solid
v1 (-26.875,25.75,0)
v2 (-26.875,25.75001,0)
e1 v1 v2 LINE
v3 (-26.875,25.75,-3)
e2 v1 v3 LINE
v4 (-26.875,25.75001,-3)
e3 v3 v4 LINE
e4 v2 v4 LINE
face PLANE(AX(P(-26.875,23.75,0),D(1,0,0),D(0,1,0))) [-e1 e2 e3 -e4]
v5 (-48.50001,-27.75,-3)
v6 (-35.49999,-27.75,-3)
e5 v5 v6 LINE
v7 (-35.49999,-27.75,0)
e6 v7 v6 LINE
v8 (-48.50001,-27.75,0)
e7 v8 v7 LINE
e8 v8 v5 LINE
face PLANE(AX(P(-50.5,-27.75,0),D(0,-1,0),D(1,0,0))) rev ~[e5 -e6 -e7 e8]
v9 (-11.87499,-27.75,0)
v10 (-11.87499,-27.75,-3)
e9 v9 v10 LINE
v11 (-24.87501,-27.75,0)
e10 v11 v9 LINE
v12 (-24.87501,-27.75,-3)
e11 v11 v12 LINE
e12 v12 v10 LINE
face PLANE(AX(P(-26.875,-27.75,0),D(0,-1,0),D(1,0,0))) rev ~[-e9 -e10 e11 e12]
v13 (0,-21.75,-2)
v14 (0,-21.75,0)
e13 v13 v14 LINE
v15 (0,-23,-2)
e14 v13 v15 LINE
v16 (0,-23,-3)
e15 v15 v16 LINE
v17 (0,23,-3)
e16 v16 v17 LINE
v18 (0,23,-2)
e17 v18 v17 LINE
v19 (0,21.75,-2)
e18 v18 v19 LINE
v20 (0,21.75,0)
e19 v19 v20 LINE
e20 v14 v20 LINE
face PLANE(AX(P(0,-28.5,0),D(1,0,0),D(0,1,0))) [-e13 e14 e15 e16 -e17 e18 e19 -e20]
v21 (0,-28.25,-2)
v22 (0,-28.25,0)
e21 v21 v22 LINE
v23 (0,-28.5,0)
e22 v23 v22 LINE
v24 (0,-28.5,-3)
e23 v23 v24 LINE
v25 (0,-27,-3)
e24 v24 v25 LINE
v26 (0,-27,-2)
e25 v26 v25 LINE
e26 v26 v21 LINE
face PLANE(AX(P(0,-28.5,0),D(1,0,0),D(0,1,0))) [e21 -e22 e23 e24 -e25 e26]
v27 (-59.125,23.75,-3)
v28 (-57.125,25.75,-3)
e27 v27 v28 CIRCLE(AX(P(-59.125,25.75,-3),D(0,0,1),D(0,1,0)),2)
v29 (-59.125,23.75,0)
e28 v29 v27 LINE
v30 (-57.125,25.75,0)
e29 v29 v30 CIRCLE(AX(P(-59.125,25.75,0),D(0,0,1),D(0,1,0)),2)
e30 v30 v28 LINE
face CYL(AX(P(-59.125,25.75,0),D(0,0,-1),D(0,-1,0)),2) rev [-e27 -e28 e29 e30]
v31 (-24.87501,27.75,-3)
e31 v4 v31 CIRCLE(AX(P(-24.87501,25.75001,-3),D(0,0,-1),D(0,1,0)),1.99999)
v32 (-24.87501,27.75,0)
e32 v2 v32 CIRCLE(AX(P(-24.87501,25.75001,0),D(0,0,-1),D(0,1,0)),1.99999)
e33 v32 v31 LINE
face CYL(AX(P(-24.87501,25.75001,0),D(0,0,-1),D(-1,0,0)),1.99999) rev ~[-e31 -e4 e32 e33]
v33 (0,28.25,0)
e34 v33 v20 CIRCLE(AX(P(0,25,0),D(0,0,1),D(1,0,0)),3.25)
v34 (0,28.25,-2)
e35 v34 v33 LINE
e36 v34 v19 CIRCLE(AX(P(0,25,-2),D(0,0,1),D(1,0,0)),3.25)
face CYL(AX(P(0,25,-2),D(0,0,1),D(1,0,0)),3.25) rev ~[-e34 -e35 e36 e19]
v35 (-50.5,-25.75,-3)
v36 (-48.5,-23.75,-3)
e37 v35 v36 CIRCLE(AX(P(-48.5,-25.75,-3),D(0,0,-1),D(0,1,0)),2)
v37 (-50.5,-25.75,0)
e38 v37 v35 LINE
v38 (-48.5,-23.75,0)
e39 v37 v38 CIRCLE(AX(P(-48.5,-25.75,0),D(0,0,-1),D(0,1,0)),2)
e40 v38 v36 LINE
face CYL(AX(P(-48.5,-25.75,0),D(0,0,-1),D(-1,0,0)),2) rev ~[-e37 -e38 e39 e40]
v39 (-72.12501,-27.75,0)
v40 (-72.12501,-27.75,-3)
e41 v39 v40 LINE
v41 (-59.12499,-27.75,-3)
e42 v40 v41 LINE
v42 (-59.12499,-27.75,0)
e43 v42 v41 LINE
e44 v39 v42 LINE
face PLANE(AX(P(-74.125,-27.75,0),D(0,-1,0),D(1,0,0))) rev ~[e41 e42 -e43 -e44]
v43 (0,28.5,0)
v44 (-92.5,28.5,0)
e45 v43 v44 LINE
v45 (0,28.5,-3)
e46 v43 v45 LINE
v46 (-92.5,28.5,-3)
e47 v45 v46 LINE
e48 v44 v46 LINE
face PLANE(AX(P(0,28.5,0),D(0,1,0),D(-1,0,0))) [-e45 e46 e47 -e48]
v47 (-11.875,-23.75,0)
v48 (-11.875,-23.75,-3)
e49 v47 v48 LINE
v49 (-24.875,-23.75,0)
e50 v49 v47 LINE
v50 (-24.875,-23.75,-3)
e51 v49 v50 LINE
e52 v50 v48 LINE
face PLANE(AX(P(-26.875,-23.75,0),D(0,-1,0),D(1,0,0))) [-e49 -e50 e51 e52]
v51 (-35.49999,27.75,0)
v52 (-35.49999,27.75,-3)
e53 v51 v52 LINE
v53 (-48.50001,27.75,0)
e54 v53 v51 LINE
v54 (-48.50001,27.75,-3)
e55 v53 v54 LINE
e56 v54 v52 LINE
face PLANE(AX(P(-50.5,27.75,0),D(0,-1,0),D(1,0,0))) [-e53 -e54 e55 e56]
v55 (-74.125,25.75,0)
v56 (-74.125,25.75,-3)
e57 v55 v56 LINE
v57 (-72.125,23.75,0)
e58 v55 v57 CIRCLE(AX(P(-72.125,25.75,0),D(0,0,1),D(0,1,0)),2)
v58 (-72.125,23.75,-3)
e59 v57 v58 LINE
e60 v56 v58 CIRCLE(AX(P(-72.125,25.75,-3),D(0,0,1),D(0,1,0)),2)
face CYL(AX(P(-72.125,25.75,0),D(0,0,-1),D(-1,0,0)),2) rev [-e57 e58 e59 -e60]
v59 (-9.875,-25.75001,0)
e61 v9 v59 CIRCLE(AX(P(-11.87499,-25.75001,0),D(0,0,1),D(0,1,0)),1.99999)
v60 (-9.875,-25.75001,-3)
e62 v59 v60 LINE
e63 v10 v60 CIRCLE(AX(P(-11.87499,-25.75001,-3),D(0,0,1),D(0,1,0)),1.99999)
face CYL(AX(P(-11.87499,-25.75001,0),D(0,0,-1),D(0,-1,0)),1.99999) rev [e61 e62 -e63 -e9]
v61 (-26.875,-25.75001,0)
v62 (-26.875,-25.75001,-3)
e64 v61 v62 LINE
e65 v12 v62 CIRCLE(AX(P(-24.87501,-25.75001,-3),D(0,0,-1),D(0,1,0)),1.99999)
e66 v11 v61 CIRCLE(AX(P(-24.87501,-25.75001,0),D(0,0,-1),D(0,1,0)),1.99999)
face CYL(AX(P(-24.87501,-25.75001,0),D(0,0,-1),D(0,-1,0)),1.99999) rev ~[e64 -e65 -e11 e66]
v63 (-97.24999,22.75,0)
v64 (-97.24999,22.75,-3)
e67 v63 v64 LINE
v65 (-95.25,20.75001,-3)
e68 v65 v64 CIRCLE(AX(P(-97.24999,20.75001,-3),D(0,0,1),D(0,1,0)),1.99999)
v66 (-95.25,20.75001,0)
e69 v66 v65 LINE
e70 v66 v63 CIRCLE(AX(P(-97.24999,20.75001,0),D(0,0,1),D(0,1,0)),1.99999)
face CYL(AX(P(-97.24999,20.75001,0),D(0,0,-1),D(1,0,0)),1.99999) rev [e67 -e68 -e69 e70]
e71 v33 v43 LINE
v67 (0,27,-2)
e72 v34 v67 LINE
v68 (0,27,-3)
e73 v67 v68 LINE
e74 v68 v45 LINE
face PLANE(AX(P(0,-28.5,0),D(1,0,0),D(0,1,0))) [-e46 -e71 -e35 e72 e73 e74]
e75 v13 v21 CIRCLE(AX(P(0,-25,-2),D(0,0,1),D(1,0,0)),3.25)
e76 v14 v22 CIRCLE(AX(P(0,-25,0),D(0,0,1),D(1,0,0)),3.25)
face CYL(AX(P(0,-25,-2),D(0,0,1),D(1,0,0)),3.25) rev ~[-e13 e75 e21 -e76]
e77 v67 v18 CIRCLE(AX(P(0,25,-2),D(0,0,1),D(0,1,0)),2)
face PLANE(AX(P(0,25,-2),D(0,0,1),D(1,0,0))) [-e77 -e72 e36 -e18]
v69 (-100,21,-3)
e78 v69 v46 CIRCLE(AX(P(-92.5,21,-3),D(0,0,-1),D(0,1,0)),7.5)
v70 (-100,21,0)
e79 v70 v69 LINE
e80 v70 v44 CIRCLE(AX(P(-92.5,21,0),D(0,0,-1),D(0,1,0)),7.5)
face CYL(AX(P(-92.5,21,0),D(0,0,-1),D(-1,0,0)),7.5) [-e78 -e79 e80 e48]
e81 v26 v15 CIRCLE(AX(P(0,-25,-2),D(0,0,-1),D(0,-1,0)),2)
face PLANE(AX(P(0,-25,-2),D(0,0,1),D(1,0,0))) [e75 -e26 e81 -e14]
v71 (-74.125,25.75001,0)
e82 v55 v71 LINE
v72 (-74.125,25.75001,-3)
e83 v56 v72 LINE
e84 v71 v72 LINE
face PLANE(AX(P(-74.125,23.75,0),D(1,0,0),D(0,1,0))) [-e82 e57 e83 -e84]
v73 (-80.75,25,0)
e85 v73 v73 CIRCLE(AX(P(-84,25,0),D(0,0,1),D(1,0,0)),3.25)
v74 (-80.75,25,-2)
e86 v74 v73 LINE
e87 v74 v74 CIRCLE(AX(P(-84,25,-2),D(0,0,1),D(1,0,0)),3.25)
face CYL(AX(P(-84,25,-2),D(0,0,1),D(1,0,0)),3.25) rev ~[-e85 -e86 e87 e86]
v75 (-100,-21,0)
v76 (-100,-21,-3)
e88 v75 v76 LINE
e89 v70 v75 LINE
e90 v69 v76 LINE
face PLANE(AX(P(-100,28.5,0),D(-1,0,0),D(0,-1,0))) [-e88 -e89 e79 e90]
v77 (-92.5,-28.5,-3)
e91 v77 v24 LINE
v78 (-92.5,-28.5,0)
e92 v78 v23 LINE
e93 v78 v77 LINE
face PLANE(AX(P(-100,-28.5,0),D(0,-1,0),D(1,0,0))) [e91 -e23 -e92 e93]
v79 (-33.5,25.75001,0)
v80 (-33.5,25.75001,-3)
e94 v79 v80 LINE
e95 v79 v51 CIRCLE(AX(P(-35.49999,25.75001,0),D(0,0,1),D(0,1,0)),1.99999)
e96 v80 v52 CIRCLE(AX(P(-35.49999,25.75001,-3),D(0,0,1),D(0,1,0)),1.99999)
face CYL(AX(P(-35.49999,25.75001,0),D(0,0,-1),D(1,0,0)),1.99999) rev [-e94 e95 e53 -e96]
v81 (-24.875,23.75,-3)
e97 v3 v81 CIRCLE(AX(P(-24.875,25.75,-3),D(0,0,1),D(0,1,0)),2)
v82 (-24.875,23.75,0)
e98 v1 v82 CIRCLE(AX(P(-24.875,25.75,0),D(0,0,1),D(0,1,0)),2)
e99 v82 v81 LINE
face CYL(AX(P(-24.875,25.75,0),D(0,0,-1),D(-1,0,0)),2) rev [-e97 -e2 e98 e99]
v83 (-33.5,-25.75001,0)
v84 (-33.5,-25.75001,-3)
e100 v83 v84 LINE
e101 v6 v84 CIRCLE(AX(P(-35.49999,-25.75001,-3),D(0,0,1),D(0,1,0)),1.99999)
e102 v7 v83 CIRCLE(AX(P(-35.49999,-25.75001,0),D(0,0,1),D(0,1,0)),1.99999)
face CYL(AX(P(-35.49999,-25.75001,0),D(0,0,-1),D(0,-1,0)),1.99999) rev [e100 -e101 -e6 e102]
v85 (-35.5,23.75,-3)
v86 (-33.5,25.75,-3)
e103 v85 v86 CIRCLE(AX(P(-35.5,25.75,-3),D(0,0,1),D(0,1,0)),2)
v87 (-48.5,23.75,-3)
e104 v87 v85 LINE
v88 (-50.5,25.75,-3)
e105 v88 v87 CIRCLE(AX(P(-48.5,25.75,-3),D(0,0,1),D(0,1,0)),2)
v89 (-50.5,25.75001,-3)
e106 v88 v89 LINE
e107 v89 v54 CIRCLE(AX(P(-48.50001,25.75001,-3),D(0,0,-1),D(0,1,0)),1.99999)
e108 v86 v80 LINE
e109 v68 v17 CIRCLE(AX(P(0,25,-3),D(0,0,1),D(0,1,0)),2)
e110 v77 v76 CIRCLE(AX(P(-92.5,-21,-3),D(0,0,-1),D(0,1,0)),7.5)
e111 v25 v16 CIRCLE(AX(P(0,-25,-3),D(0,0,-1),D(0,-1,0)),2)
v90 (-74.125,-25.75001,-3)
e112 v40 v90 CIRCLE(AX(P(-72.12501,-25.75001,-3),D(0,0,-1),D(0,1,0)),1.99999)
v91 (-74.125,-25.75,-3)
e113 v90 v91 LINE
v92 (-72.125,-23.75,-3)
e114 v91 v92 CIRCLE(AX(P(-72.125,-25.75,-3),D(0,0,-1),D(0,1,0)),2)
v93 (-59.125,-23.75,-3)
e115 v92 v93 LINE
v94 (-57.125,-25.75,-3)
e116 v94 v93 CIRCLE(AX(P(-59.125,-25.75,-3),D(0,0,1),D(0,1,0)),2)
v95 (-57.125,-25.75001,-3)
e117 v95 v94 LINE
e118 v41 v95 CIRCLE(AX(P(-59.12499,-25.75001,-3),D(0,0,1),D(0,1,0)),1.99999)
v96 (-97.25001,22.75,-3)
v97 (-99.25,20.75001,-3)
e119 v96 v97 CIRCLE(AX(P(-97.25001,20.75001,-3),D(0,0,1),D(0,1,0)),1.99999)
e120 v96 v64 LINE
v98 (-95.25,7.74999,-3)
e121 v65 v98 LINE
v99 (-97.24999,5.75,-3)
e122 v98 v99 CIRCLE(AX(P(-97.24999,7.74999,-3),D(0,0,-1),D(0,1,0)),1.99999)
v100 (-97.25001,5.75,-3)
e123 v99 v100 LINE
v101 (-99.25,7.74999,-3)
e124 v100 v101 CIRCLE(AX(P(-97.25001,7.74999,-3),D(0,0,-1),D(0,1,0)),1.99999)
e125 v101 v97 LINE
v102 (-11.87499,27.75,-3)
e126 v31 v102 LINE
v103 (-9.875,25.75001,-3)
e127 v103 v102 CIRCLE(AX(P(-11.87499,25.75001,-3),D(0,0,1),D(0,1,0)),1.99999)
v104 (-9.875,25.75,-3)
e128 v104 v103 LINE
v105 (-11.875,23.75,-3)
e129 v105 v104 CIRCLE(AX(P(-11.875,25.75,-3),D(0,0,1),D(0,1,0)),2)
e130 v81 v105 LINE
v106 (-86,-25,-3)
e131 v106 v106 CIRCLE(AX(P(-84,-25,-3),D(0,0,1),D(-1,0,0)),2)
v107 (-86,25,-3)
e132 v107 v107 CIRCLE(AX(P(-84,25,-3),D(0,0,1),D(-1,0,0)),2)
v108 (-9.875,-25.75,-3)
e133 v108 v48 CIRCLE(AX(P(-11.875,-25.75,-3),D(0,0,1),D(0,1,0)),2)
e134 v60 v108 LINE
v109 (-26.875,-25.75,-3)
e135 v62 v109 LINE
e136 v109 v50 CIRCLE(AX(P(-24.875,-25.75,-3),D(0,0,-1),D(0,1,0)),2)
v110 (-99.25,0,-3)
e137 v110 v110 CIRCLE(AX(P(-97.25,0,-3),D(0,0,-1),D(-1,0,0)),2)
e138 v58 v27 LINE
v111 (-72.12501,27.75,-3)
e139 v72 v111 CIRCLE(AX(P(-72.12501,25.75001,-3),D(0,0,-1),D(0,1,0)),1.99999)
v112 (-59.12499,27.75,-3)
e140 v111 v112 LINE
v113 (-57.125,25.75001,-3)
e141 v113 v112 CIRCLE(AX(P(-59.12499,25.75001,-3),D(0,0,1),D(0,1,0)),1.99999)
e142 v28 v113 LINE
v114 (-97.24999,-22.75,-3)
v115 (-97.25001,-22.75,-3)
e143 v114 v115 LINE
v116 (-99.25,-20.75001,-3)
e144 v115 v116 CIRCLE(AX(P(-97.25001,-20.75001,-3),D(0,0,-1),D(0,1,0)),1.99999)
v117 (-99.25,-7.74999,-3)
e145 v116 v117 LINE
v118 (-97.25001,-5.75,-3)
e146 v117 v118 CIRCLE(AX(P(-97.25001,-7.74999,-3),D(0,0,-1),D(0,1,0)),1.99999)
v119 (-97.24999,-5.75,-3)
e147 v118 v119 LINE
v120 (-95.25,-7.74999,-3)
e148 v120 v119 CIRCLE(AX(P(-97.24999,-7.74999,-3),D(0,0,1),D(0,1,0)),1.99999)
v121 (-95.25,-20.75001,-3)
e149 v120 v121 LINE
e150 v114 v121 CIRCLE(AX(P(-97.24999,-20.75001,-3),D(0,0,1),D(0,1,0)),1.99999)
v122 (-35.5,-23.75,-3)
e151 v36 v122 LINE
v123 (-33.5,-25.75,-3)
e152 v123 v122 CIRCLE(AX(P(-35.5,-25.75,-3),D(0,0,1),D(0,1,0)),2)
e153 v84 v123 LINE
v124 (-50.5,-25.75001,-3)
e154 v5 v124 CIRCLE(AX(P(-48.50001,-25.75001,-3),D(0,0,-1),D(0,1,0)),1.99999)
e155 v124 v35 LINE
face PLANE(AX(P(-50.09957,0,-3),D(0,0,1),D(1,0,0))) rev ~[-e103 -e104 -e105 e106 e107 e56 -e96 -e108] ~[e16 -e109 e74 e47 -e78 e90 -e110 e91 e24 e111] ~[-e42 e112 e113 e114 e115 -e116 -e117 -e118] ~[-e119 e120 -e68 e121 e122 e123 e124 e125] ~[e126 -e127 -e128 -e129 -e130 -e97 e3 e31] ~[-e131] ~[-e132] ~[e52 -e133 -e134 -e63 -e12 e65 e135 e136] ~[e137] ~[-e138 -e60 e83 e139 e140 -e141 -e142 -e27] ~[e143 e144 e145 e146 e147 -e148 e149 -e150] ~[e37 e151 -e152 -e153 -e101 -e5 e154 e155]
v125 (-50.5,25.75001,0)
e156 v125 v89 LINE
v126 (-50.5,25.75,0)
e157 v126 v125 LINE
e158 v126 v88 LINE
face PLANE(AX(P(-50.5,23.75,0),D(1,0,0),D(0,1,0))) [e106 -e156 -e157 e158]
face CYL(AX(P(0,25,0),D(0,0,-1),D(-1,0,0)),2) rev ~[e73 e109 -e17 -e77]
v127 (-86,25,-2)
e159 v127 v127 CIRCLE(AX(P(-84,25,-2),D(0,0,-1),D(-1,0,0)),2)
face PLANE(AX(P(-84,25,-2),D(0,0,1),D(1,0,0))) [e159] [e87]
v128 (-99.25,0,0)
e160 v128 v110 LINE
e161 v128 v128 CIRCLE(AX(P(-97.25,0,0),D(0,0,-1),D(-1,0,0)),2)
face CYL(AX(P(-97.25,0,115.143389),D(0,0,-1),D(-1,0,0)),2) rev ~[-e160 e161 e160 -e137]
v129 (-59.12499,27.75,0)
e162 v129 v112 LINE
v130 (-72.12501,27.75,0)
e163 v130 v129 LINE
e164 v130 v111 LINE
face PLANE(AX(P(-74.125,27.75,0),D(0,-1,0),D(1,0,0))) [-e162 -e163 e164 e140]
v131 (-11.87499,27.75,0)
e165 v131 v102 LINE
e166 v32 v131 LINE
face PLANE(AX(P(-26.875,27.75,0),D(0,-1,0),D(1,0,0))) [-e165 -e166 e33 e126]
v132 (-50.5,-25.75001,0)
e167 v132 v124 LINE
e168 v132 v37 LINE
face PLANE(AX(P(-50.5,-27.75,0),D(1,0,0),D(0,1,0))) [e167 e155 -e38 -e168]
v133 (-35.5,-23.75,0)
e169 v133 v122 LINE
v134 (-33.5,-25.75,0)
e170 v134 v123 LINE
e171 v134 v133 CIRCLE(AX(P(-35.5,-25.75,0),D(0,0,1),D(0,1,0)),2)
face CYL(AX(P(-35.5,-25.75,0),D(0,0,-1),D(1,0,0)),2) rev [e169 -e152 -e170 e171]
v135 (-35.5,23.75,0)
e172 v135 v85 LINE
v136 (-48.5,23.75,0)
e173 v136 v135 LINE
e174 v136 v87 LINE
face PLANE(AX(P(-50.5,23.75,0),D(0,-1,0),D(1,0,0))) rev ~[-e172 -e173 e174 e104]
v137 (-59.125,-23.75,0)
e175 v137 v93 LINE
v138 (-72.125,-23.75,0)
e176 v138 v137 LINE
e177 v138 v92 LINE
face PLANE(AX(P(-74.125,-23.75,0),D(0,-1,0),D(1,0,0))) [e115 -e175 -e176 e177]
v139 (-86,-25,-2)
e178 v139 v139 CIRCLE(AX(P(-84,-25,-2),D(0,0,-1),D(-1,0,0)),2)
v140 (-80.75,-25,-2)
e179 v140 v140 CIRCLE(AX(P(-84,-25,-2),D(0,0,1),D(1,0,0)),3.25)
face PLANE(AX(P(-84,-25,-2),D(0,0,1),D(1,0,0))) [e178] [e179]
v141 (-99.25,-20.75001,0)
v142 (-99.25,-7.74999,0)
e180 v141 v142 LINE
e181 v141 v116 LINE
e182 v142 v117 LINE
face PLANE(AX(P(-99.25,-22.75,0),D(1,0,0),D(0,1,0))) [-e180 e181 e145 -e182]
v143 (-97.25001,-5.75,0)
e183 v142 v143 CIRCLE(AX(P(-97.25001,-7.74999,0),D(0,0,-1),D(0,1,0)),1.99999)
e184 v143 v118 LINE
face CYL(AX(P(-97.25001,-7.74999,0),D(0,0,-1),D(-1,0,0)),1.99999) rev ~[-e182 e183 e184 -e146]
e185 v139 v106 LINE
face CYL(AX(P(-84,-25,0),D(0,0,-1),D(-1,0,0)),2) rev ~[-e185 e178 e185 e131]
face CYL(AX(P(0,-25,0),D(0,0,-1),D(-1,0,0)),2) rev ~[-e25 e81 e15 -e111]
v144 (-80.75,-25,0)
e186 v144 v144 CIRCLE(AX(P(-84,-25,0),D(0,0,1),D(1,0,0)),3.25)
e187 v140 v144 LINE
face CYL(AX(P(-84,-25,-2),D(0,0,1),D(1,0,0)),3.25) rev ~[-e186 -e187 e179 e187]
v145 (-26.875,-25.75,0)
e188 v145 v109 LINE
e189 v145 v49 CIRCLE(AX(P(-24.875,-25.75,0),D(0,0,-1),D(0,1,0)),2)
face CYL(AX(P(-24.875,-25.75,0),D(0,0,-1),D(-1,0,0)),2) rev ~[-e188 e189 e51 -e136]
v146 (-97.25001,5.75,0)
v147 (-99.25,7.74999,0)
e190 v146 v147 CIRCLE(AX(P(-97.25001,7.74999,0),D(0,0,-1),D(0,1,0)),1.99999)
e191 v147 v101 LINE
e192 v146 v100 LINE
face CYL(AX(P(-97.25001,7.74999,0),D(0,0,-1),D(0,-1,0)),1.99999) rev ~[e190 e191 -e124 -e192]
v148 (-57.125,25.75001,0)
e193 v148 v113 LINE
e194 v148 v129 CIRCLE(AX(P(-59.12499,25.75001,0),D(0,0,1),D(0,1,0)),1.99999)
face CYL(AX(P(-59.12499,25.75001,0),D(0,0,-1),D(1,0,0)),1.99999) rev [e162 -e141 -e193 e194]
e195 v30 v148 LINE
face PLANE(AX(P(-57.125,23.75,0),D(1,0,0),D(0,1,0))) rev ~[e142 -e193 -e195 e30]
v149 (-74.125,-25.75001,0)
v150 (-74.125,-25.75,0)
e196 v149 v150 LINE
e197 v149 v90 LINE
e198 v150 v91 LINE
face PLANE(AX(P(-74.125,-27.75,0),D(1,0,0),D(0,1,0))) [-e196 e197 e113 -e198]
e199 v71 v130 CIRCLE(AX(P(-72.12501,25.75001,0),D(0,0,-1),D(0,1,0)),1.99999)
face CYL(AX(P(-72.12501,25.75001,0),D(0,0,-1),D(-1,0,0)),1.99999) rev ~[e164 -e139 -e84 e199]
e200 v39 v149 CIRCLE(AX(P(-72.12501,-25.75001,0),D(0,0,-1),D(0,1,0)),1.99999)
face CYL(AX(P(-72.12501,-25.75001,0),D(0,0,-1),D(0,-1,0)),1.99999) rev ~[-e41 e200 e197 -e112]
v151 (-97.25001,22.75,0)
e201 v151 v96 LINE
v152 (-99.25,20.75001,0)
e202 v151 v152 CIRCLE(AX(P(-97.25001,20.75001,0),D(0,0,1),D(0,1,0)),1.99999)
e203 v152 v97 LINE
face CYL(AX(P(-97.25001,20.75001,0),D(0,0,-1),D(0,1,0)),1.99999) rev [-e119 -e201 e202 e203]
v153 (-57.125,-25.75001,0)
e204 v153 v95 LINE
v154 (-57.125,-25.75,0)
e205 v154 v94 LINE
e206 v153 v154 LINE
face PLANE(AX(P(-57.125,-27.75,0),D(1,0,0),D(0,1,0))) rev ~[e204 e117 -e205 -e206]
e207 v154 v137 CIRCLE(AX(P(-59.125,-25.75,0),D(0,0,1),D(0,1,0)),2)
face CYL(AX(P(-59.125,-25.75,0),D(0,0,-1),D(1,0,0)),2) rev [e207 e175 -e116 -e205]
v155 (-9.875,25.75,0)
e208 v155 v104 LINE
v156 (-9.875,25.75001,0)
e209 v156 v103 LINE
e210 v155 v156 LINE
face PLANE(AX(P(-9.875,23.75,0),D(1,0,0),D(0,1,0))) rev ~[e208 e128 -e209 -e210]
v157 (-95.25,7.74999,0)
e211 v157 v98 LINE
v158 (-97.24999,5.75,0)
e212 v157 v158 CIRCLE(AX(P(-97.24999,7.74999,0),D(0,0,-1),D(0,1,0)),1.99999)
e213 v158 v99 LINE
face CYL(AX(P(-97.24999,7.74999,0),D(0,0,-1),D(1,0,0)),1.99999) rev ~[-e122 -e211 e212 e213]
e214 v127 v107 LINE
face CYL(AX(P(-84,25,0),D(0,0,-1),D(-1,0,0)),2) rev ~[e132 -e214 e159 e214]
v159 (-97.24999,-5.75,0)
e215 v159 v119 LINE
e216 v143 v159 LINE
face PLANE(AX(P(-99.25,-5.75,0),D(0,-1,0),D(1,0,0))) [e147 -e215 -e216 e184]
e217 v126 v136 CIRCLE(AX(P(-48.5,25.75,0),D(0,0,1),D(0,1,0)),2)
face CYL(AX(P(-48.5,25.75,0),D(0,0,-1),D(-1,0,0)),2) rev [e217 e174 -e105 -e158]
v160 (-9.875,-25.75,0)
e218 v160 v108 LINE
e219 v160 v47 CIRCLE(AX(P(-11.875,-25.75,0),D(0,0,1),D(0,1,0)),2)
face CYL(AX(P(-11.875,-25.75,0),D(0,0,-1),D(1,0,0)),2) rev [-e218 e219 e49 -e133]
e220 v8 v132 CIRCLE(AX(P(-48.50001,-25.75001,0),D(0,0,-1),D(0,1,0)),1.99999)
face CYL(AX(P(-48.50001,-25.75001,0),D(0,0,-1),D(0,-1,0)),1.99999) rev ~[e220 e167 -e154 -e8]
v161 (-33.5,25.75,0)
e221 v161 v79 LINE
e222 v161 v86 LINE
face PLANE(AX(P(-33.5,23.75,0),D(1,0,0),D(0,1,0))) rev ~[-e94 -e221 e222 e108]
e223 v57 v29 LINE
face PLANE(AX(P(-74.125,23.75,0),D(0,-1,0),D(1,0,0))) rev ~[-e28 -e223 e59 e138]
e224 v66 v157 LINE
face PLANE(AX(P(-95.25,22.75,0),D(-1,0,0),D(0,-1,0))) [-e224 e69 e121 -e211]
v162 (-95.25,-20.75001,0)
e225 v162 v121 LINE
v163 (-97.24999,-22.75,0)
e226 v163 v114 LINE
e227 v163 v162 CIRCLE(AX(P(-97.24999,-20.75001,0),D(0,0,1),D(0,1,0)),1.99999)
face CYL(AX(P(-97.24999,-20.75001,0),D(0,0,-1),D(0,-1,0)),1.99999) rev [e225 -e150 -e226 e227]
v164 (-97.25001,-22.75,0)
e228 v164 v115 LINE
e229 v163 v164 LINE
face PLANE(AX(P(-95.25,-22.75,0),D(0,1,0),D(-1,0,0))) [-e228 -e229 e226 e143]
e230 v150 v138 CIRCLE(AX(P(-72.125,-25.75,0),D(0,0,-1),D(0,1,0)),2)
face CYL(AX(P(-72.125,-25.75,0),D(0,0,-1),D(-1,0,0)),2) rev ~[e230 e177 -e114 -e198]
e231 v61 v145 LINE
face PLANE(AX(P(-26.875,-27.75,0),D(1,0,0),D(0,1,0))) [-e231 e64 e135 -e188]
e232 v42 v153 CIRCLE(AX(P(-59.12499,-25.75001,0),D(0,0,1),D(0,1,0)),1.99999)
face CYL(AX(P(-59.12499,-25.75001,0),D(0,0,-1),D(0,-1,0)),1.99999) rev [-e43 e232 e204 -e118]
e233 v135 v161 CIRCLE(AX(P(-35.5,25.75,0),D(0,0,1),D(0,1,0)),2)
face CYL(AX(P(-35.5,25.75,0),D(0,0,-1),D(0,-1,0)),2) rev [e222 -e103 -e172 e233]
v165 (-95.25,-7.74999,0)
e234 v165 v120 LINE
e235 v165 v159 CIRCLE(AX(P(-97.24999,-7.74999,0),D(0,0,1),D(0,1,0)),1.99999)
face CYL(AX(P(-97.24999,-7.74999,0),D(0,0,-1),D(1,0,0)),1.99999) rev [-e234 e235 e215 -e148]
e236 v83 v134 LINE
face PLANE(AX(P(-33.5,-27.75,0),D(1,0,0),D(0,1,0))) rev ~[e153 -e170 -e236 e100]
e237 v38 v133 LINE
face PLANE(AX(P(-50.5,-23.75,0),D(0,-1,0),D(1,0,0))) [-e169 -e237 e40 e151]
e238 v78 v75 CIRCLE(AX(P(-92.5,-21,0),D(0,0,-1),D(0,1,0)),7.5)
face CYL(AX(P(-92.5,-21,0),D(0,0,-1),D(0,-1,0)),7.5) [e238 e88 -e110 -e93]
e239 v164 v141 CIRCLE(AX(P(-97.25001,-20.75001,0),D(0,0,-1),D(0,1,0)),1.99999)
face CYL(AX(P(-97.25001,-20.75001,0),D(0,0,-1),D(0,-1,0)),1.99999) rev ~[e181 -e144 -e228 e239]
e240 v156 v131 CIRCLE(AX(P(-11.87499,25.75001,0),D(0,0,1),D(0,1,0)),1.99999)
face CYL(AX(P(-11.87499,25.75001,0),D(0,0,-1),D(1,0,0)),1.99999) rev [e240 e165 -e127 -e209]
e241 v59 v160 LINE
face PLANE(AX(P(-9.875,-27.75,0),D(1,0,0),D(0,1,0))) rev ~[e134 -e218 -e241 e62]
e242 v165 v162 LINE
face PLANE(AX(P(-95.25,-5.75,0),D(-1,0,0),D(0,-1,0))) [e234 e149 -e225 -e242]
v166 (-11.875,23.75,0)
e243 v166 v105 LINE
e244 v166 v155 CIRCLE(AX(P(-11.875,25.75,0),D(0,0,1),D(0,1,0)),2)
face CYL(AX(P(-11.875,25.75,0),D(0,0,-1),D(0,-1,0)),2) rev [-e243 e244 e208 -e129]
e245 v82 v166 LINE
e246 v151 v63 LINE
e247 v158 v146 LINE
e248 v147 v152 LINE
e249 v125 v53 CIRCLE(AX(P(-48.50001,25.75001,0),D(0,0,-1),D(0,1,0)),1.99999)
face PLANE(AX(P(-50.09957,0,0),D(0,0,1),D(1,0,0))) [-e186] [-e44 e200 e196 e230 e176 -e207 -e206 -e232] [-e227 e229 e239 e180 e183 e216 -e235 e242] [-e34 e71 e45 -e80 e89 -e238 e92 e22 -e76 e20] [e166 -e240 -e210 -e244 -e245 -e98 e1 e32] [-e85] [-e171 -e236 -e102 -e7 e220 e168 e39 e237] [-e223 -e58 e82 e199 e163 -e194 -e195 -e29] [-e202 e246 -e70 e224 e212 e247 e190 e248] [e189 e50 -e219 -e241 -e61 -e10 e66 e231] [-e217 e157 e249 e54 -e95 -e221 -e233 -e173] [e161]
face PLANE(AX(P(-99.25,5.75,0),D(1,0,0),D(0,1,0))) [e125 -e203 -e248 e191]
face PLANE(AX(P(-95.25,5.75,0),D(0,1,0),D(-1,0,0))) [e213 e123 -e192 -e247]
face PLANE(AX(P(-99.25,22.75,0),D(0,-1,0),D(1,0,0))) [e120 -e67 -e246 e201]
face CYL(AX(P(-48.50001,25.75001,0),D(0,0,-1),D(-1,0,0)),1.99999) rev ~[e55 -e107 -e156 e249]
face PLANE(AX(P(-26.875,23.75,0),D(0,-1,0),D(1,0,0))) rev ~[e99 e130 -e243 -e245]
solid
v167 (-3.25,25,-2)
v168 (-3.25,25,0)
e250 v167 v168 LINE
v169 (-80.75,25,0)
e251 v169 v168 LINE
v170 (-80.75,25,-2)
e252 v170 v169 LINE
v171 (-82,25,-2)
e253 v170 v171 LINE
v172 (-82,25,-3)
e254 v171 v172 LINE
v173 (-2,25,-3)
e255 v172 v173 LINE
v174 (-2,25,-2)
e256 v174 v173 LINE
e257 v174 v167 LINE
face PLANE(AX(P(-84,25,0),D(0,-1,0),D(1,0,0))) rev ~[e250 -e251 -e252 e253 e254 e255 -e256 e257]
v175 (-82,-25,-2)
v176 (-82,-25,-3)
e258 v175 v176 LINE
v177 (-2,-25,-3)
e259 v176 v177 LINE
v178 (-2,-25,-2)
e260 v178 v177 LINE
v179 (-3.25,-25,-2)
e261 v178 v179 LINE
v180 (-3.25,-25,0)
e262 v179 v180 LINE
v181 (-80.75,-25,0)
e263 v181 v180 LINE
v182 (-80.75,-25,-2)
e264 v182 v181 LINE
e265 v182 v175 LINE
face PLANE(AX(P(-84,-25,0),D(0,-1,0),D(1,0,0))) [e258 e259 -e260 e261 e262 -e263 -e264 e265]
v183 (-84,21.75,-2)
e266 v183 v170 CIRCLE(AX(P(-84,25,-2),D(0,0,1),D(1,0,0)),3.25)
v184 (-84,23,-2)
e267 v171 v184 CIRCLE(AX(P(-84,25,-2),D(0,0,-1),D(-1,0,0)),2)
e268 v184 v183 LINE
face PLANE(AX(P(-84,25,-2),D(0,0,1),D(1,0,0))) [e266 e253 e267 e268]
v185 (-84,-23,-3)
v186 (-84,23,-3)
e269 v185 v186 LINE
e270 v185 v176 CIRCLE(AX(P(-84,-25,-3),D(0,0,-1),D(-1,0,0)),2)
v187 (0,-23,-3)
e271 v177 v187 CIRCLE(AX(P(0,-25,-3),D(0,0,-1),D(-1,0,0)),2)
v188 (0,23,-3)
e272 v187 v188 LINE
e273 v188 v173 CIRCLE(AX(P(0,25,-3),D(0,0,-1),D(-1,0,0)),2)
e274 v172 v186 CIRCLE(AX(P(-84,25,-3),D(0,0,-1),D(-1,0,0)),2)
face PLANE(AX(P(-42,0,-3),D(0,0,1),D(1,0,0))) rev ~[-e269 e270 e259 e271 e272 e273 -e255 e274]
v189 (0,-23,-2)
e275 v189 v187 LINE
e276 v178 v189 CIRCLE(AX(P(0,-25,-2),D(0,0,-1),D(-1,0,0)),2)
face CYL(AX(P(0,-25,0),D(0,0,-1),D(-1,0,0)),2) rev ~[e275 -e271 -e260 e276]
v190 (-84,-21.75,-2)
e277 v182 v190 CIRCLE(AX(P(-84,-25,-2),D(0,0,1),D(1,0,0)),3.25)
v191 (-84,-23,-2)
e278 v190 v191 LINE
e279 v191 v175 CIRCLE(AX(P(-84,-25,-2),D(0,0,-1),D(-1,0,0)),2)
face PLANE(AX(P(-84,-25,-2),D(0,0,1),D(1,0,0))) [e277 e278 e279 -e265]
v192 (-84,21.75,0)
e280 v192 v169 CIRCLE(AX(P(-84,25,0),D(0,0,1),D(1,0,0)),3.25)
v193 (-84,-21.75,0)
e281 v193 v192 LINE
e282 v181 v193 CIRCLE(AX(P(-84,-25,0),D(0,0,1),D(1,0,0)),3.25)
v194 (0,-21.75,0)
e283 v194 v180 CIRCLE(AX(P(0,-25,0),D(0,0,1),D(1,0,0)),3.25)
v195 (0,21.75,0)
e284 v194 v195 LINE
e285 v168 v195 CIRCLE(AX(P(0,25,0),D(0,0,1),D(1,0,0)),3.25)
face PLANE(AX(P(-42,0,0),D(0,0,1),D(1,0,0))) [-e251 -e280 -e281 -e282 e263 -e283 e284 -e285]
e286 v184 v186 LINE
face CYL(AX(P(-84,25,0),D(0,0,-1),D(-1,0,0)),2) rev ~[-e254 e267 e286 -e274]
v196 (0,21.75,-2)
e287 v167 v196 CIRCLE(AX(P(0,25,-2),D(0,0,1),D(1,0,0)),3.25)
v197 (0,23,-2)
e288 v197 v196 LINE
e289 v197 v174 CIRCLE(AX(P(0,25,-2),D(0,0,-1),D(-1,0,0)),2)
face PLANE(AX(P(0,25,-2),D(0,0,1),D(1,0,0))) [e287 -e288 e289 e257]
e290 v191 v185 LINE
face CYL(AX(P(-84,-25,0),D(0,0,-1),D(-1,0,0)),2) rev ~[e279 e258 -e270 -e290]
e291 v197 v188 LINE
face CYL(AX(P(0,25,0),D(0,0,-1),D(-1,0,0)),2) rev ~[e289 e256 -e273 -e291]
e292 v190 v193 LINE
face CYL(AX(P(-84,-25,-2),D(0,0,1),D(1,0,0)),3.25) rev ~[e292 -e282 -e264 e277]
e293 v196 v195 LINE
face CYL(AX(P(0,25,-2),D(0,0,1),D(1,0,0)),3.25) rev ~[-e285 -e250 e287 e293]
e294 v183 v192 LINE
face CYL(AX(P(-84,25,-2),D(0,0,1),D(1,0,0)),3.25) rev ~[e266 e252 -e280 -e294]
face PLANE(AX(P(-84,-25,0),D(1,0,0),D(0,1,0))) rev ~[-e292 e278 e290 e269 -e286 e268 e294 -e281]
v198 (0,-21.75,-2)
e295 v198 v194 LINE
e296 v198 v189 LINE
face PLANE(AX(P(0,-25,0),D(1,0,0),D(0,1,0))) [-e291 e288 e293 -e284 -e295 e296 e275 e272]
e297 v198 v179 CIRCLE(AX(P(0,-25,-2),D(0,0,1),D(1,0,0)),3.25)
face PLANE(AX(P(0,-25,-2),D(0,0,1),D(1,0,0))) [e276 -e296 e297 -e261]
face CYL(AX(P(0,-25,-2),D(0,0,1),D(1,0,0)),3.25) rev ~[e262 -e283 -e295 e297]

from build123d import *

# Parameters (mm, degrees)
F1_W             = 84
F1_H             = 50
F2_DEPTH         = 3
F0_W             = 17
F0_H             = 4
F3_D             = 4
F3_DEPTH         = 3
F3_CBORE_D       = 6.5
F3_CBORE_DEPTH   = 2
F3_TIP           = 1.2017212381
F3_2_D           = 4
F3_2_DEPTH       = 3
F3_2_CBORE_D     = 6.5
F3_2_CBORE_DEPTH = 2
F3_2_TIP         = 1.2017212381
F4_D             = 4
F5_R             = 1.99999
F6_R             = 2
F7_R             = 7.5


# Not quite as in the source:
# - a fillet or chamfer is up to 0.001 mm smaller than in the source, because OpenCascade refuses the exact size


with BuildPart() as f2:
    # F1 (on Top) → F2 (new body)
    with BuildSketch(Plane.XY):
        with Locations((-42, 0)):
            Rectangle(F1_W, F1_H)
    extrude(amount=-F2_DEPTH)

    # F3
    with Locations(Plane.XY):
        with Locations((-84, 25), (0, 25), (0, -25), (-84, -25)):
            CounterBoreHole(F3_D / 2, F3_CBORE_D / 2, F3_CBORE_DEPTH, depth=F3_DEPTH)
            with Locations((0, 0, -(F3_DEPTH + F3_TIP / 2))):  # 118° drill point
                Cone(0, F3_D / 2, F3_TIP, mode=Mode.SUBTRACT)


with BuildPart() as f2b:
    # F0 (on Top) → F2, piece 2 (new body)
    with BuildSketch(Plane.XY):
        Polygon((-97.75, -28.5), (0, -28.5), (0, 25.7993545383), (0, 28.5), (-97.75, 28.5), (-97.75, 25.7993545383), (-97.75, 22.75), (-95.25, 22.75), (-95.25, 5.75), (-97.75, 5.75), (-97.75, 0), (-97.75, -5.75), (-95.25, -5.75), (-95.25, -22.75), (-97.75, -22.75), align=None)
        with Locations((-65.625, -25.75)):
            Rectangle(F0_W, F0_H, mode=Mode.SUBTRACT)
        with Locations((-42, -25.75)):
            Rectangle(F0_W, F0_H, mode=Mode.SUBTRACT)
        with Locations((-18.375, -25.75)):
            Rectangle(F0_W, F0_H, mode=Mode.SUBTRACT)
        with Locations((-65.625, 25.7500003576)):
            Rectangle(F0_W, F0_H, mode=Mode.SUBTRACT)
        with Locations((-42, 25.7500003576)):
            Rectangle(F0_W, F0_H, mode=Mode.SUBTRACT)
        with Locations((-18.375, 25.7500003576)):
            Rectangle(F0_W, F0_H, mode=Mode.SUBTRACT)
        Polygon((-100, -28.5), (-97.75, -28.5), (-97.75, -22.75), (-99.25, -22.75), (-99.25, -5.75), (-97.75, -5.75), (-97.75, 0), (-97.75, 5.75), (-99.25, 5.75), (-99.25, 22.75), (-97.75, 22.75), (-97.75, 25.7993545383), (-97.75, 28.5), (-100, 28.5), align=None)
    extrude(amount=-F2_DEPTH)

    # F3#2
    with Locations(Plane.XY):
        with Locations((-84, 25), (0, 25), (0, -25), (-84, -25)):
            CounterBoreHole(F3_2_D / 2, F3_2_CBORE_D / 2, F3_2_CBORE_DEPTH, depth=F3_2_DEPTH)
            with Locations((0, 0, -(F3_2_DEPTH + F3_2_TIP / 2))):  # 118° drill point
                Cone(0, F3_2_D / 2, F3_2_TIP, mode=Mode.SUBTRACT)

    # F4 (through all)
    with Locations(Plane.XY):
        with Locations((-97.25, 0)):
            Hole(F4_D / 2)

    # F5 (radius 2 in the source; OpenCascade refuses exactly that, so slightly less here)
    f5_edges = [f2b.edges().sort_by_distance(p)[0] for p in [
        (-99.25, 22.75, -1.5),
        (-95.25, 22.75, -1.5),
        (-99.25, 5.75, -1.5),
        (-95.25, 5.75, -1.5),
        (-99.25, -5.75, -1.5),
        (-95.25, -5.75, -1.5),
        (-95.25, -22.75, -1.5),
        (-99.25, -22.75, -1.5),
        (-74.125, -27.75, -1.5),
        (-50.5, -27.75, -1.5),
        (-57.125, -27.75, -1.5),
        (-9.875, -27.75, -1.5),
        (-33.5, -27.75, -1.5),
        (-26.875, -27.75, -1.5),
        (-9.875, 27.75, -1.5),
        (-33.5, 27.75, -1.5),
        (-57.125, 27.75, -1.5),
        (-74.125, 27.75, -1.5),
        (-50.5, 27.75, -1.5),
        (-26.875, 27.75, -1.5),
    ]]
    fillet(f5_edges, radius=F5_R)

    # F6
    f6_edges = [f2b.edges().sort_by_distance(p)[0] for p in [
        (-74.125, 23.75, -1.5),
        (-57.125, 23.75, -1.5),
        (-50.5, 23.75, -1.5),
        (-33.5, 23.75, -1.5),
        (-26.875, 23.75, -1.5),
        (-9.875, 23.75, -1.5),
        (-9.875, -23.75, -1.5),
        (-26.875, -23.75, -1.5),
        (-50.5, -23.75, -1.5),
        (-33.5, -23.75, -1.5),
        (-57.125, -23.75, -1.5),
        (-74.125, -23.75, -1.5),
    ]]
    fillet(f6_edges, radius=F6_R)

    # F7
    f7_edges = [f2b.edges().sort_by_distance(p)[0] for p in [
        (-100, 28.5, -1.5),
        (-100, -28.5, -1.5),
    ]]
    fillet(f7_edges, radius=F7_R)


solid = Compound([f2.part, f2b.part])
